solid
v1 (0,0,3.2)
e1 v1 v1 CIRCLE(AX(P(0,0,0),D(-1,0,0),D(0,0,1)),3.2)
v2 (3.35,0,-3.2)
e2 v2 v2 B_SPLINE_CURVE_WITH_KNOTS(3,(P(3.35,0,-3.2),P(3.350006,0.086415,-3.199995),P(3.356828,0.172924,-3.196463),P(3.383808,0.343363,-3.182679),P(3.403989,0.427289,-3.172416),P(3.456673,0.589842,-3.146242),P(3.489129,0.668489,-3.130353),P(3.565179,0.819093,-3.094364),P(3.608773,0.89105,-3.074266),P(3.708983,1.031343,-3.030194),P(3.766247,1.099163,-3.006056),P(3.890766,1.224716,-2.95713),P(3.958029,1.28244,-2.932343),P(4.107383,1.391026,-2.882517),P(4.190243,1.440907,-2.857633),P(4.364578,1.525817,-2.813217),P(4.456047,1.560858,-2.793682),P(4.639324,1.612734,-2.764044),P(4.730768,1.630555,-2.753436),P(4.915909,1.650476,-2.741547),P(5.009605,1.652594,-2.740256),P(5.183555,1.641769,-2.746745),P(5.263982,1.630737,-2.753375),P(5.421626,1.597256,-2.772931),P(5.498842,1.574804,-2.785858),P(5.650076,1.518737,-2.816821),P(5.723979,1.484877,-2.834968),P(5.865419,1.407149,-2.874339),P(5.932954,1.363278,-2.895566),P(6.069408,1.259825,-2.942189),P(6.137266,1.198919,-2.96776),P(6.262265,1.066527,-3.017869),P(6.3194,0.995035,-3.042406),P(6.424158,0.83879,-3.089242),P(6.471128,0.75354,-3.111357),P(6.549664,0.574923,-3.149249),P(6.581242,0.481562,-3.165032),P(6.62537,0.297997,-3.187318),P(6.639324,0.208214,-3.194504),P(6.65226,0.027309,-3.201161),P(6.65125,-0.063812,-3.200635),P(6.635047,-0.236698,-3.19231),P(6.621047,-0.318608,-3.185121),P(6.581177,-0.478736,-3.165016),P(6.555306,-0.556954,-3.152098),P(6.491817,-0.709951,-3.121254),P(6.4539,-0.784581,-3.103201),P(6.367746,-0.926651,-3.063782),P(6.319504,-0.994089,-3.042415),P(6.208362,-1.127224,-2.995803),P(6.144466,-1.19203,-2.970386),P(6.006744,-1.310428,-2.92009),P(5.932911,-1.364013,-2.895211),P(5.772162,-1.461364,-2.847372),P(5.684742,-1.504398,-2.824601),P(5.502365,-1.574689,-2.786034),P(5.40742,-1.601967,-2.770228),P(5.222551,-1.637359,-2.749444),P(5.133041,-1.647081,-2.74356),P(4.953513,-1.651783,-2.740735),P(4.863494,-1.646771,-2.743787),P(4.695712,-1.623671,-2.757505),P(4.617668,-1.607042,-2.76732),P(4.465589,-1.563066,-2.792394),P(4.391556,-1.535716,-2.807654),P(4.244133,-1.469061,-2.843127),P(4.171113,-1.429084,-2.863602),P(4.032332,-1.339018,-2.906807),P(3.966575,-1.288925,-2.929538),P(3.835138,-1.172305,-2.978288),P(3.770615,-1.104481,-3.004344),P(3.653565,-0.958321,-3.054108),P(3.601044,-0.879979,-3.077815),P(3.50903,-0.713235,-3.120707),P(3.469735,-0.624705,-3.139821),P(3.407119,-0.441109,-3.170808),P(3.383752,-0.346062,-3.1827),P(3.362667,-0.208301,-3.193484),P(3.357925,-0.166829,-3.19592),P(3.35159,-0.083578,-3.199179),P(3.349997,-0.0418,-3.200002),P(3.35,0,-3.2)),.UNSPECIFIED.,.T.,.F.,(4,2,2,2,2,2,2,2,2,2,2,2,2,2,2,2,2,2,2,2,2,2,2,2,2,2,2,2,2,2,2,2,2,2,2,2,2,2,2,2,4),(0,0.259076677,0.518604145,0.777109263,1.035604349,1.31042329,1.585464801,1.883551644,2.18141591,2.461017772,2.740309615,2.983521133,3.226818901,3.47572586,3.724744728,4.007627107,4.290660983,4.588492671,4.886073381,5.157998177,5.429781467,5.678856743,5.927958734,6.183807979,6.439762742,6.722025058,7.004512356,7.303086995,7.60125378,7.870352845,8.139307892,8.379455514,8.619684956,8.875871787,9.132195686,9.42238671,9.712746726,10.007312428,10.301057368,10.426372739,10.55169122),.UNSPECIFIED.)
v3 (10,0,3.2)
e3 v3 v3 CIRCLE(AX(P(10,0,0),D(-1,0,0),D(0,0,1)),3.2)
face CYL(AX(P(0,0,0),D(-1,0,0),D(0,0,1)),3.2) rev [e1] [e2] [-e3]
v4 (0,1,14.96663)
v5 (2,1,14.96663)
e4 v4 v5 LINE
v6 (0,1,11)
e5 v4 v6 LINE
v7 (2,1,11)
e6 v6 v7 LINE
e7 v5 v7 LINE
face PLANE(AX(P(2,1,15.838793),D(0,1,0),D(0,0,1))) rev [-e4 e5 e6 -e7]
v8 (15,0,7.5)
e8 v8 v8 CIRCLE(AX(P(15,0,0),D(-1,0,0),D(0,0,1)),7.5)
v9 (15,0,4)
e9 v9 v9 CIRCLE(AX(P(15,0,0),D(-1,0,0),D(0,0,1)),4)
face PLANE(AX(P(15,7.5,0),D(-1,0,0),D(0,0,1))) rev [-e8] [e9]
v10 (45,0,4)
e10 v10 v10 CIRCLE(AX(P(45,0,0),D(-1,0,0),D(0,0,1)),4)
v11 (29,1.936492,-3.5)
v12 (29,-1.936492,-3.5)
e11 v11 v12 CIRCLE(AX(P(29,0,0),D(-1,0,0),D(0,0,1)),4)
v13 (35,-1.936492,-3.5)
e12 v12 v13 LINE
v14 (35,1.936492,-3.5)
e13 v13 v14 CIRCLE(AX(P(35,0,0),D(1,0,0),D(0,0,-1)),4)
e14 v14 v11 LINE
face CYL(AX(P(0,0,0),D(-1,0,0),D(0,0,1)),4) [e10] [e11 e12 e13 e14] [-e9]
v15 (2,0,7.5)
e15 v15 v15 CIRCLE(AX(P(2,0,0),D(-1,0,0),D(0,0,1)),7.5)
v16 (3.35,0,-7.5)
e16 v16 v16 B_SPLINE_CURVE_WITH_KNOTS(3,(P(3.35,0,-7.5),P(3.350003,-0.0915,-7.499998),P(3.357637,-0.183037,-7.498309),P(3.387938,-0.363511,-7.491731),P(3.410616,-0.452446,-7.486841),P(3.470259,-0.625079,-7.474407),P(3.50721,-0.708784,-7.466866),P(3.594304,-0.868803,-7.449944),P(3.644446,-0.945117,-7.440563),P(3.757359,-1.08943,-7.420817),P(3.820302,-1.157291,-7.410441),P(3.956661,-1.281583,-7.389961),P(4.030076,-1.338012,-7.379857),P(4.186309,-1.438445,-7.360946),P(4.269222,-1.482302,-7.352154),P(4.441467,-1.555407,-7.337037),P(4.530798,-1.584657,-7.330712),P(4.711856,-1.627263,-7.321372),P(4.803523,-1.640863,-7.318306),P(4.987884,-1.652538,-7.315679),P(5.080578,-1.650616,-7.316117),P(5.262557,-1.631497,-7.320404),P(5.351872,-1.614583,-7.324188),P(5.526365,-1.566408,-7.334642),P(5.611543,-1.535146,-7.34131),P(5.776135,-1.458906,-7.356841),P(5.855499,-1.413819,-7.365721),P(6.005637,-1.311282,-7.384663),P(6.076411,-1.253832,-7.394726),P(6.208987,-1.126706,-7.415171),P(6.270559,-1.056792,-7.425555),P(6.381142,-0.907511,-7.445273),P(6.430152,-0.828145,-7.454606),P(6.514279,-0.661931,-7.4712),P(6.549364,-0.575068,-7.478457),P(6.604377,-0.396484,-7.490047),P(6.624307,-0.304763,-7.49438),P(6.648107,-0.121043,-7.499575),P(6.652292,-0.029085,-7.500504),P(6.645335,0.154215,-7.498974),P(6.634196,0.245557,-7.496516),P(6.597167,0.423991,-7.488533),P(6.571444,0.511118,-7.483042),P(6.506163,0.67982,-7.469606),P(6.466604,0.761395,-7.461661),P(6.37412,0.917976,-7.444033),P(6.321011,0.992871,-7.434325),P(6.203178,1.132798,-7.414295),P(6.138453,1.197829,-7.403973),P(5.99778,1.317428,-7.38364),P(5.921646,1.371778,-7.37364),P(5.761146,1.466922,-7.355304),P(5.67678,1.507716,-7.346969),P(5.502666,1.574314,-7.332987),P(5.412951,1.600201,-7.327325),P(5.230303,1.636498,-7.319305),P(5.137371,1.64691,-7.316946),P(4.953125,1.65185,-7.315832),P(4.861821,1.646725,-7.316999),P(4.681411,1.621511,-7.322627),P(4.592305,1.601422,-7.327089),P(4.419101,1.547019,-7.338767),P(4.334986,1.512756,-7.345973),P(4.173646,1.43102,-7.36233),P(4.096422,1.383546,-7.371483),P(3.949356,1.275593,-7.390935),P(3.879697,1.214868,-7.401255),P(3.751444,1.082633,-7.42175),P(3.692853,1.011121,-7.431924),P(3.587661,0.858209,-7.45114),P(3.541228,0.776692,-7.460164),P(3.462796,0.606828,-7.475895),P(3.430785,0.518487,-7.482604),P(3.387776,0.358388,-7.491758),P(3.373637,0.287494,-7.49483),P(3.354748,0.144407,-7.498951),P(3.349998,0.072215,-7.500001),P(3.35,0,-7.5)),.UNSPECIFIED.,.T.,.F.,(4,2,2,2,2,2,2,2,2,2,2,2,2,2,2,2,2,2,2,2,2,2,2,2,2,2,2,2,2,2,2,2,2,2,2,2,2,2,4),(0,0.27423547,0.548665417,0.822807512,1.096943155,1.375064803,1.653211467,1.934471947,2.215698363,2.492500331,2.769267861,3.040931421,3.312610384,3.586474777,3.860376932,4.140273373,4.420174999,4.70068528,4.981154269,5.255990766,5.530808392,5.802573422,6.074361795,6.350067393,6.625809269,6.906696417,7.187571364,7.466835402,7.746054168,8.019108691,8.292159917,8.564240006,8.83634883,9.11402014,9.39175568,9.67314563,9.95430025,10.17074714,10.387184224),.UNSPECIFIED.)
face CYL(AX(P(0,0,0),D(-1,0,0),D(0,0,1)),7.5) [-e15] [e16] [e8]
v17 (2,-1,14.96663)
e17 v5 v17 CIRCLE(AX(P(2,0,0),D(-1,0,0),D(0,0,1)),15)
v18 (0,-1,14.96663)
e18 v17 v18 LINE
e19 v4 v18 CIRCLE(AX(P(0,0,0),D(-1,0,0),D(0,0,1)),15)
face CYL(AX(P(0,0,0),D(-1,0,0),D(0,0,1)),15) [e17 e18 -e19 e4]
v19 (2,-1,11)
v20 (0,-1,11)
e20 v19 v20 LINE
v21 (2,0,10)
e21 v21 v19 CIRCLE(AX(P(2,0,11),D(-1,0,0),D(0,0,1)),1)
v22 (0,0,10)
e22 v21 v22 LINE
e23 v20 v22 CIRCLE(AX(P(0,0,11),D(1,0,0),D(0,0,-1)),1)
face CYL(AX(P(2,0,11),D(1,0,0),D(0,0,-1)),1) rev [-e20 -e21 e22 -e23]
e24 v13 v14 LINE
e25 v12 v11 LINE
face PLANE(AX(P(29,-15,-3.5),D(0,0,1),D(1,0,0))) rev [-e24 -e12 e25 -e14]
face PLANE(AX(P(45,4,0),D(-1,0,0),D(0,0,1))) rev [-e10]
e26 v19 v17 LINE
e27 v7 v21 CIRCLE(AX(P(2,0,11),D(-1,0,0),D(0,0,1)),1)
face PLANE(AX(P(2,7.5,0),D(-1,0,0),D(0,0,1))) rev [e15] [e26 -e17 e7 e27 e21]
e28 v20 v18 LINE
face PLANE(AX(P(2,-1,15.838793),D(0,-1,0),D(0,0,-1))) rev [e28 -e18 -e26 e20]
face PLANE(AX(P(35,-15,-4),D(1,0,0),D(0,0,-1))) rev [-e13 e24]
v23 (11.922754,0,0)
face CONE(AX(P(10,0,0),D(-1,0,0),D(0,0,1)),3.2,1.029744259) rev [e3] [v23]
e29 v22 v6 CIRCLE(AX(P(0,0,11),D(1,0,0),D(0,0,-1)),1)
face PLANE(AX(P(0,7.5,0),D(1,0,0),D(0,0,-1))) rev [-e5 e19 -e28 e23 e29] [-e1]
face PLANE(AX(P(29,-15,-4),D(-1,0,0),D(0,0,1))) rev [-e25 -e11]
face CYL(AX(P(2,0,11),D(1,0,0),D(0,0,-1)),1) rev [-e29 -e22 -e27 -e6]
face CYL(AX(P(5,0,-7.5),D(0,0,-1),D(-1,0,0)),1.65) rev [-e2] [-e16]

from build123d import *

# Parameters (mm, degrees)
SCHNITT_LINEAR_AUSTRAGEN1_DEPTH      = 50.749371855
SCHNITT_LINEAR_AUSTRAGEN1_DEPTH_BACK = 50.749371855
SKIZZE3_W                            = 6
SKIZZE3_H                            = 0.5
M4_GEWINDEBOHRUNG2_D                 = 3.3
M4_GEWINDEBOHRUNG2_DEPTH             = 8.5
M4_GEWINDEBOHRUNG2_TIP               = 0.991420021
SKIZZE10_W                           = 5.838792557
SKIZZE10_H                           = 2
SCHNITT_LINEAR_AUSTRAGEN2_DEPTH      = 2
VERRUNDUNG1_R                        = 1


with BuildPart() as part:
    # Skizze1 → Rotation1 (revolve)
    with BuildSketch(Plane.XY, mode=Mode.PRIVATE) as rotation1_sk:
        Polygon((0, 3.2), (10, 3.2), (11.922753981, 0), (45, 0), (45, 4), (15, 4), (15, 7.5), (2, 7.5), (2, 15), (0, 15), (0, 7.5), align=None)
    revolve(rotation1_sk.sketch.rotate(Axis((0, 0, 0), (1, 0, 0)), 90), axis=Axis((0, 0, 0), (1, 0, 0)))

    # Skizze3 → Schnitt-Linear austragen1 (cut, two sides: drawn at the far end of the back side and taken through both)
    with BuildSketch(Plane(origin=(0, 0, 0), x_dir=(1, 0, 0), z_dir=(0, 1, 0)).offset(-SCHNITT_LINEAR_AUSTRAGEN1_DEPTH_BACK)):
        with Locations((32, 3.75)):
            Rectangle(SKIZZE3_W, SKIZZE3_H)
    extrude(amount=SCHNITT_LINEAR_AUSTRAGEN1_DEPTH + SCHNITT_LINEAR_AUSTRAGEN1_DEPTH_BACK, mode=Mode.SUBTRACT)

    # M4 Gewindebohrung2
    with Locations(Plane(origin=(0, 0, -7.5), x_dir=(1, 0, 0), z_dir=(0, 0, -1))):
        with Locations((5, 0)):
            Hole(M4_GEWINDEBOHRUNG2_D / 2, depth=M4_GEWINDEBOHRUNG2_DEPTH)
            with Locations((0, 0, -(M4_GEWINDEBOHRUNG2_DEPTH + M4_GEWINDEBOHRUNG2_TIP / 2))):  # 118° drill point
                Cone(0, M4_GEWINDEBOHRUNG2_D / 2, M4_GEWINDEBOHRUNG2_TIP, mode=Mode.SUBTRACT)

    # Skizze10 → Schnitt-Linear austragen2 (cut)
    with BuildSketch(Plane.ZY):
        with Locations((12.919396279, 0)):
            Rectangle(SKIZZE10_W, SKIZZE10_H)
    extrude(amount=-SCHNITT_LINEAR_AUSTRAGEN2_DEPTH, mode=Mode.SUBTRACT)

    # Verrundung1
    verrundung1_edges = [part.edges().sort_by_distance(p)[0] for p in [
        (1, -1, 10),
        (1, 1, 10),
    ]]
    fillet(verrundung1_edges, radius=VERRUNDUNG1_R - 0.0001)  # a hair under: the kernel refuses the full size


solid = part.part
